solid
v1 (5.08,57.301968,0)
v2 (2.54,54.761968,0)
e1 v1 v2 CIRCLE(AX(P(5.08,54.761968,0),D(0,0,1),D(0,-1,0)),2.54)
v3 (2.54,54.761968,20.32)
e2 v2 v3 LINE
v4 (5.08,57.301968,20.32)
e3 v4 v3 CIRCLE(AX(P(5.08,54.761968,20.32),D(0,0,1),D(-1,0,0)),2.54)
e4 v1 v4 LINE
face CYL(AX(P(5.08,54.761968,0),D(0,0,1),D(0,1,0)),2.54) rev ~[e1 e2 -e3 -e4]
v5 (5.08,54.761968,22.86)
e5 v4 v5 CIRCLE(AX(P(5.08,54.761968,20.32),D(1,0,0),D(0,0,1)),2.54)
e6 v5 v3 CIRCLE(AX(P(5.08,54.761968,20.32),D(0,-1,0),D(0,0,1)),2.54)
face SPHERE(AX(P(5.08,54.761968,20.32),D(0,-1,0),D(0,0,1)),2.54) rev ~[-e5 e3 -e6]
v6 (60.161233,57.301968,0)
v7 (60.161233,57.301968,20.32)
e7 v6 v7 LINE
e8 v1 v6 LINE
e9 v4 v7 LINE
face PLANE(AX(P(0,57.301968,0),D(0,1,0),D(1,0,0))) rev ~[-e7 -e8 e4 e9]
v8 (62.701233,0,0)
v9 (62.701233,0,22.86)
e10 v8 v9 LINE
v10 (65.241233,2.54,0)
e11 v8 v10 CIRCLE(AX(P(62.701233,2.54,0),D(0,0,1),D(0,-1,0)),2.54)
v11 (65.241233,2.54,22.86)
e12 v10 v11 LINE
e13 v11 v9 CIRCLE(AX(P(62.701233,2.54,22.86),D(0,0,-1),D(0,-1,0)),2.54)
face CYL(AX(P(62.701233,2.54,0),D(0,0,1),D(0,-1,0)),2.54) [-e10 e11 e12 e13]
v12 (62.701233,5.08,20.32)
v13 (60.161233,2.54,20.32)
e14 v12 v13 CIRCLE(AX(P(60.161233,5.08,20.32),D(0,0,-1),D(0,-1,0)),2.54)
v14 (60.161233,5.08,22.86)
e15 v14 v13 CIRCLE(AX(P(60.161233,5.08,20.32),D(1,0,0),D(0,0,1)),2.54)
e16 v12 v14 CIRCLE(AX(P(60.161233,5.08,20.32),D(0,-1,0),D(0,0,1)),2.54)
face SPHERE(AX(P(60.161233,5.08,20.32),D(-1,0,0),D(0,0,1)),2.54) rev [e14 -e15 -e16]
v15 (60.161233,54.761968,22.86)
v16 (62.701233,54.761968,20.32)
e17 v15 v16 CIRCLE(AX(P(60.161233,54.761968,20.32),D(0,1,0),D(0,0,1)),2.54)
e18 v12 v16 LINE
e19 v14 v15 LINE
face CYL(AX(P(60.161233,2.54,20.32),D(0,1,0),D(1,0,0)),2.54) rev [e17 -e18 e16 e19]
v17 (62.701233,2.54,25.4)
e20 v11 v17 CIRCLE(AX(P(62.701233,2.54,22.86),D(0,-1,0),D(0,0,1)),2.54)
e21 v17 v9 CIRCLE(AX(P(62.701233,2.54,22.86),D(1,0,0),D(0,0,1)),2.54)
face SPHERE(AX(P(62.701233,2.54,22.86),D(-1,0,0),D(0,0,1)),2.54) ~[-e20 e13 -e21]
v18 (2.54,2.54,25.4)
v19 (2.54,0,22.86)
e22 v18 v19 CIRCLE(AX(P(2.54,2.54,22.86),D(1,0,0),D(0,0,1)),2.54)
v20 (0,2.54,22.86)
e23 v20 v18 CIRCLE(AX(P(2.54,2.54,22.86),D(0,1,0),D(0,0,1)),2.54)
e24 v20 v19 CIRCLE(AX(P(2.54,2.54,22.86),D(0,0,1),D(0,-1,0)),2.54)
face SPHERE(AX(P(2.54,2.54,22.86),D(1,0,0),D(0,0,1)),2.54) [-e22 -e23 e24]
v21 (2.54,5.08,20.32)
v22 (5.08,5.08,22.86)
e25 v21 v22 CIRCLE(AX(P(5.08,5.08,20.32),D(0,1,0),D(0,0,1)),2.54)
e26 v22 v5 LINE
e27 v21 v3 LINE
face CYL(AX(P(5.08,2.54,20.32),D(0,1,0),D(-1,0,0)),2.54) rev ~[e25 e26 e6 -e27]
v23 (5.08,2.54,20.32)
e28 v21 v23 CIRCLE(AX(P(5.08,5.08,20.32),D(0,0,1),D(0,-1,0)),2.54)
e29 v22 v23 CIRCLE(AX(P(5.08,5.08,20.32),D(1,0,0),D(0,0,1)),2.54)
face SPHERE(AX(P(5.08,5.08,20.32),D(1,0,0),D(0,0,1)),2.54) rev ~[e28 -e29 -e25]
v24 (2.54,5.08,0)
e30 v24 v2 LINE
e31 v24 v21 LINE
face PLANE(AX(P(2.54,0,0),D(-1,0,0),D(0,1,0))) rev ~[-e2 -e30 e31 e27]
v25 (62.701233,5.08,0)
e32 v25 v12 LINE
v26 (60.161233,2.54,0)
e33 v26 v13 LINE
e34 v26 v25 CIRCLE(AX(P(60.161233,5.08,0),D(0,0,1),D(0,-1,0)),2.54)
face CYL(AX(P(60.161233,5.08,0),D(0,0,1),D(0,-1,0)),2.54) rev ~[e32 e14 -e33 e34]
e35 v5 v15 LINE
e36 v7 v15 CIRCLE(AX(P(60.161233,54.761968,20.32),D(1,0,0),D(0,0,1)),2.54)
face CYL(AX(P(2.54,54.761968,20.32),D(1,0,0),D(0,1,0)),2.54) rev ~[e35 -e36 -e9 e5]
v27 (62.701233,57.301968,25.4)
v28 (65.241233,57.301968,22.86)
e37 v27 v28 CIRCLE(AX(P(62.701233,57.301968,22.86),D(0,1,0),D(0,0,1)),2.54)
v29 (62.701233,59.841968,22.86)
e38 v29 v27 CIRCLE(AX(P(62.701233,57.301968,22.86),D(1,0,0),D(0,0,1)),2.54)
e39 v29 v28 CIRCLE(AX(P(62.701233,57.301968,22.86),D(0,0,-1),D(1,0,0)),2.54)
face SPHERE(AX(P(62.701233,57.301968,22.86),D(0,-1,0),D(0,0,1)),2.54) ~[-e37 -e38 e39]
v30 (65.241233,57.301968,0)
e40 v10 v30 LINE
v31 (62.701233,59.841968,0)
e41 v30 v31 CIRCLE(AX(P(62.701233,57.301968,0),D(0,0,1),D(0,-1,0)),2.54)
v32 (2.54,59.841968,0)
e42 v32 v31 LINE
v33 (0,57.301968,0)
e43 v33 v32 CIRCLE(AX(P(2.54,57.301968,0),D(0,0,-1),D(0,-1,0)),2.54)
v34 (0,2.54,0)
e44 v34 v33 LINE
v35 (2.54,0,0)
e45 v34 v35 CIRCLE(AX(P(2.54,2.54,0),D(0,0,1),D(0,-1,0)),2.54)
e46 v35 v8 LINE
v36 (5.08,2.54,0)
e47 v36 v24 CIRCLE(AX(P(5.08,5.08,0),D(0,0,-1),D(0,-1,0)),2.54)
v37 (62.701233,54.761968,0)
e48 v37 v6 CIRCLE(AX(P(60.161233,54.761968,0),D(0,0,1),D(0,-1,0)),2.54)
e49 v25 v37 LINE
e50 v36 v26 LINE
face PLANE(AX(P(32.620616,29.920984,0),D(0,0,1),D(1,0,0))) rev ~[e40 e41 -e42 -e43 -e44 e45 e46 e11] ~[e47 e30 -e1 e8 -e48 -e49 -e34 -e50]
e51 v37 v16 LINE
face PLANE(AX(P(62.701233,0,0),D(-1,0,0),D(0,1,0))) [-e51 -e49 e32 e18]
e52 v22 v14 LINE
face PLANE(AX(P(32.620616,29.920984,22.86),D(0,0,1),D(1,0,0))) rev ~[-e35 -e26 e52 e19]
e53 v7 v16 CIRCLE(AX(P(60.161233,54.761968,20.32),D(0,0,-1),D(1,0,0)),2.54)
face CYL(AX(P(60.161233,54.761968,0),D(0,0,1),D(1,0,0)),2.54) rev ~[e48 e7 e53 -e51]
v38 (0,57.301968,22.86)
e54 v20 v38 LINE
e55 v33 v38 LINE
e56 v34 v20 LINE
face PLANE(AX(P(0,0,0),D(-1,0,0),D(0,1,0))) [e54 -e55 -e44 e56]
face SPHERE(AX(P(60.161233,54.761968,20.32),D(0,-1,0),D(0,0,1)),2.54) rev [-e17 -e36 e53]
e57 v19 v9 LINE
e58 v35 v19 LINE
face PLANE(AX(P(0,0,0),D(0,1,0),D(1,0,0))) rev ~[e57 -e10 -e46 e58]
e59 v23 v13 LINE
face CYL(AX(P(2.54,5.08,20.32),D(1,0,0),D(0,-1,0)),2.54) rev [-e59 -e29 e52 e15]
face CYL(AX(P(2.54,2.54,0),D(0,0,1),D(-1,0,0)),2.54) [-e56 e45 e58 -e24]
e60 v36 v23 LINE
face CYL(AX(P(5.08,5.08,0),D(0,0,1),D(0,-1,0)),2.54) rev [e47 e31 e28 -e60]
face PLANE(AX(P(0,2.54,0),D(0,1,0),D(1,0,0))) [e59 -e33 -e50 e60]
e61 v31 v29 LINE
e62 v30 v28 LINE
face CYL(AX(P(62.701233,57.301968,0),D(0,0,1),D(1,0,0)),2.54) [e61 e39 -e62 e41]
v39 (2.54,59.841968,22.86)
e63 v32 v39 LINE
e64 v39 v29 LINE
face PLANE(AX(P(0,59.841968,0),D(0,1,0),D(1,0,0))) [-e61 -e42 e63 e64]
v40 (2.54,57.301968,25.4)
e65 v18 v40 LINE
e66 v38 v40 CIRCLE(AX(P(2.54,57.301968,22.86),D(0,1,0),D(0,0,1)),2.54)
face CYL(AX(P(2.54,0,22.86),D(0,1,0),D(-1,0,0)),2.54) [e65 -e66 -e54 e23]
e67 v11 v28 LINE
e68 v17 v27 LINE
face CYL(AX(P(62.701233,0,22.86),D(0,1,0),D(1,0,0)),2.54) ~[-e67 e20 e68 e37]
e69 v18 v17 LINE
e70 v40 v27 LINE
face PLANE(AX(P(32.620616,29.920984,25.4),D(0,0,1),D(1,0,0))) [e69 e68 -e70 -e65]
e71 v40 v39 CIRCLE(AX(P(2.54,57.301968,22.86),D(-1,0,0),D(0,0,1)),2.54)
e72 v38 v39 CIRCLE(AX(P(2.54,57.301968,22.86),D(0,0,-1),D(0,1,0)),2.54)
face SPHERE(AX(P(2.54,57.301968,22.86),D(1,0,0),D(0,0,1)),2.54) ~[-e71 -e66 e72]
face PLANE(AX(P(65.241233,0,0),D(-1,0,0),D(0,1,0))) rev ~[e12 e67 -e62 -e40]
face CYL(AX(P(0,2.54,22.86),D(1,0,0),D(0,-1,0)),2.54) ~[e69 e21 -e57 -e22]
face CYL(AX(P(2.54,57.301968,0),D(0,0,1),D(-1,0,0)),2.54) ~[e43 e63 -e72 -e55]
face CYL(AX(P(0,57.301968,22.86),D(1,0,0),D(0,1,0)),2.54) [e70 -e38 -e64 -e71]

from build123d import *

# Parameters (mm, degrees)
F0_W     = 65.2412325144
F0_H     = 59.8419681191
F1_DEPTH = 25.4
F2_R     = 2.54
F3_T     = 2.54
F4_R     = 2.54


# Not quite as in the source:
# - a shell that OpenCascade refuses in one call is made with other operations: the cavity is built on its own and cut out


with BuildPart() as f1:
    # F0 (on Top) → F1 (new body)
    with BuildSketch(Plane.XY):
        with Locations((32.6206162572, 29.9209840596)):
            Rectangle(F0_W, F0_H)
    extrude(amount=F1_DEPTH)

    # F2
    f2_edges = [f1.edges().sort_by_distance(p)[0] for p in [
        (32.620616, 0, 25.4),
        (65.241233, 29.920984, 25.4),
        (32.620616, 59.841968, 25.4),
        (0, 29.920984, 25.4),
        (65.241233, 0, 12.7),
        (0, 0, 12.7),
        (65.241233, 59.841968, 12.7),
        (0, 59.841968, 12.7),
    ]]
    fillet(f2_edges, radius=F2_R)

    # F3: shell of thickness 2.54, made by hand


with BuildPart() as f3_core1:
    # F3_t2: copy of F1
    add(f1.part)

    # the walls: a layer under each face that stays
    f3_faces = [f3_core1.faces().sort_by_distance(p)[0] for p in [
        (0, 29.9209840596, 11.43),
        (32.6206162572, 59.8419681191, 11.43),
        (32.6206162572, 0, 11.43),
        (65.2412325144, 29.9209840596, 11.43),
        (32.6206162572, 29.9209840596, 25.4),
    ]]
    thicken(f3_faces, amount=-F3_T, mode=Mode.SUBTRACT)


with BuildPart() as f1_1:
    add(f1.part)

    # what is left inside the walls is the cavity
    f3_cavity = [f3_core1.part.solids().sort_by_distance(p)[0] for p in [
        (32.620616, 20.793989, 0.0254),
    ]]
    add(f3_cavity, mode=Mode.SUBTRACT)

    # F4
    f4_edges = [f1_1.edges().sort_by_distance(p)[0] for p in [
        (32.620616, 2.54, 22.86),
        (2.54, 29.920984, 22.86),
        (62.701233, 29.920984, 22.86),
        (32.620616, 57.301968, 22.86),
        (62.701233, 57.301968, 11.43),
        (2.54, 57.301968, 11.43),
        (2.54, 2.54, 11.43),
        (62.701233, 2.54, 11.43),
    ]]
    fillet(f4_edges, radius=F4_R)


solid = f1_1.part
